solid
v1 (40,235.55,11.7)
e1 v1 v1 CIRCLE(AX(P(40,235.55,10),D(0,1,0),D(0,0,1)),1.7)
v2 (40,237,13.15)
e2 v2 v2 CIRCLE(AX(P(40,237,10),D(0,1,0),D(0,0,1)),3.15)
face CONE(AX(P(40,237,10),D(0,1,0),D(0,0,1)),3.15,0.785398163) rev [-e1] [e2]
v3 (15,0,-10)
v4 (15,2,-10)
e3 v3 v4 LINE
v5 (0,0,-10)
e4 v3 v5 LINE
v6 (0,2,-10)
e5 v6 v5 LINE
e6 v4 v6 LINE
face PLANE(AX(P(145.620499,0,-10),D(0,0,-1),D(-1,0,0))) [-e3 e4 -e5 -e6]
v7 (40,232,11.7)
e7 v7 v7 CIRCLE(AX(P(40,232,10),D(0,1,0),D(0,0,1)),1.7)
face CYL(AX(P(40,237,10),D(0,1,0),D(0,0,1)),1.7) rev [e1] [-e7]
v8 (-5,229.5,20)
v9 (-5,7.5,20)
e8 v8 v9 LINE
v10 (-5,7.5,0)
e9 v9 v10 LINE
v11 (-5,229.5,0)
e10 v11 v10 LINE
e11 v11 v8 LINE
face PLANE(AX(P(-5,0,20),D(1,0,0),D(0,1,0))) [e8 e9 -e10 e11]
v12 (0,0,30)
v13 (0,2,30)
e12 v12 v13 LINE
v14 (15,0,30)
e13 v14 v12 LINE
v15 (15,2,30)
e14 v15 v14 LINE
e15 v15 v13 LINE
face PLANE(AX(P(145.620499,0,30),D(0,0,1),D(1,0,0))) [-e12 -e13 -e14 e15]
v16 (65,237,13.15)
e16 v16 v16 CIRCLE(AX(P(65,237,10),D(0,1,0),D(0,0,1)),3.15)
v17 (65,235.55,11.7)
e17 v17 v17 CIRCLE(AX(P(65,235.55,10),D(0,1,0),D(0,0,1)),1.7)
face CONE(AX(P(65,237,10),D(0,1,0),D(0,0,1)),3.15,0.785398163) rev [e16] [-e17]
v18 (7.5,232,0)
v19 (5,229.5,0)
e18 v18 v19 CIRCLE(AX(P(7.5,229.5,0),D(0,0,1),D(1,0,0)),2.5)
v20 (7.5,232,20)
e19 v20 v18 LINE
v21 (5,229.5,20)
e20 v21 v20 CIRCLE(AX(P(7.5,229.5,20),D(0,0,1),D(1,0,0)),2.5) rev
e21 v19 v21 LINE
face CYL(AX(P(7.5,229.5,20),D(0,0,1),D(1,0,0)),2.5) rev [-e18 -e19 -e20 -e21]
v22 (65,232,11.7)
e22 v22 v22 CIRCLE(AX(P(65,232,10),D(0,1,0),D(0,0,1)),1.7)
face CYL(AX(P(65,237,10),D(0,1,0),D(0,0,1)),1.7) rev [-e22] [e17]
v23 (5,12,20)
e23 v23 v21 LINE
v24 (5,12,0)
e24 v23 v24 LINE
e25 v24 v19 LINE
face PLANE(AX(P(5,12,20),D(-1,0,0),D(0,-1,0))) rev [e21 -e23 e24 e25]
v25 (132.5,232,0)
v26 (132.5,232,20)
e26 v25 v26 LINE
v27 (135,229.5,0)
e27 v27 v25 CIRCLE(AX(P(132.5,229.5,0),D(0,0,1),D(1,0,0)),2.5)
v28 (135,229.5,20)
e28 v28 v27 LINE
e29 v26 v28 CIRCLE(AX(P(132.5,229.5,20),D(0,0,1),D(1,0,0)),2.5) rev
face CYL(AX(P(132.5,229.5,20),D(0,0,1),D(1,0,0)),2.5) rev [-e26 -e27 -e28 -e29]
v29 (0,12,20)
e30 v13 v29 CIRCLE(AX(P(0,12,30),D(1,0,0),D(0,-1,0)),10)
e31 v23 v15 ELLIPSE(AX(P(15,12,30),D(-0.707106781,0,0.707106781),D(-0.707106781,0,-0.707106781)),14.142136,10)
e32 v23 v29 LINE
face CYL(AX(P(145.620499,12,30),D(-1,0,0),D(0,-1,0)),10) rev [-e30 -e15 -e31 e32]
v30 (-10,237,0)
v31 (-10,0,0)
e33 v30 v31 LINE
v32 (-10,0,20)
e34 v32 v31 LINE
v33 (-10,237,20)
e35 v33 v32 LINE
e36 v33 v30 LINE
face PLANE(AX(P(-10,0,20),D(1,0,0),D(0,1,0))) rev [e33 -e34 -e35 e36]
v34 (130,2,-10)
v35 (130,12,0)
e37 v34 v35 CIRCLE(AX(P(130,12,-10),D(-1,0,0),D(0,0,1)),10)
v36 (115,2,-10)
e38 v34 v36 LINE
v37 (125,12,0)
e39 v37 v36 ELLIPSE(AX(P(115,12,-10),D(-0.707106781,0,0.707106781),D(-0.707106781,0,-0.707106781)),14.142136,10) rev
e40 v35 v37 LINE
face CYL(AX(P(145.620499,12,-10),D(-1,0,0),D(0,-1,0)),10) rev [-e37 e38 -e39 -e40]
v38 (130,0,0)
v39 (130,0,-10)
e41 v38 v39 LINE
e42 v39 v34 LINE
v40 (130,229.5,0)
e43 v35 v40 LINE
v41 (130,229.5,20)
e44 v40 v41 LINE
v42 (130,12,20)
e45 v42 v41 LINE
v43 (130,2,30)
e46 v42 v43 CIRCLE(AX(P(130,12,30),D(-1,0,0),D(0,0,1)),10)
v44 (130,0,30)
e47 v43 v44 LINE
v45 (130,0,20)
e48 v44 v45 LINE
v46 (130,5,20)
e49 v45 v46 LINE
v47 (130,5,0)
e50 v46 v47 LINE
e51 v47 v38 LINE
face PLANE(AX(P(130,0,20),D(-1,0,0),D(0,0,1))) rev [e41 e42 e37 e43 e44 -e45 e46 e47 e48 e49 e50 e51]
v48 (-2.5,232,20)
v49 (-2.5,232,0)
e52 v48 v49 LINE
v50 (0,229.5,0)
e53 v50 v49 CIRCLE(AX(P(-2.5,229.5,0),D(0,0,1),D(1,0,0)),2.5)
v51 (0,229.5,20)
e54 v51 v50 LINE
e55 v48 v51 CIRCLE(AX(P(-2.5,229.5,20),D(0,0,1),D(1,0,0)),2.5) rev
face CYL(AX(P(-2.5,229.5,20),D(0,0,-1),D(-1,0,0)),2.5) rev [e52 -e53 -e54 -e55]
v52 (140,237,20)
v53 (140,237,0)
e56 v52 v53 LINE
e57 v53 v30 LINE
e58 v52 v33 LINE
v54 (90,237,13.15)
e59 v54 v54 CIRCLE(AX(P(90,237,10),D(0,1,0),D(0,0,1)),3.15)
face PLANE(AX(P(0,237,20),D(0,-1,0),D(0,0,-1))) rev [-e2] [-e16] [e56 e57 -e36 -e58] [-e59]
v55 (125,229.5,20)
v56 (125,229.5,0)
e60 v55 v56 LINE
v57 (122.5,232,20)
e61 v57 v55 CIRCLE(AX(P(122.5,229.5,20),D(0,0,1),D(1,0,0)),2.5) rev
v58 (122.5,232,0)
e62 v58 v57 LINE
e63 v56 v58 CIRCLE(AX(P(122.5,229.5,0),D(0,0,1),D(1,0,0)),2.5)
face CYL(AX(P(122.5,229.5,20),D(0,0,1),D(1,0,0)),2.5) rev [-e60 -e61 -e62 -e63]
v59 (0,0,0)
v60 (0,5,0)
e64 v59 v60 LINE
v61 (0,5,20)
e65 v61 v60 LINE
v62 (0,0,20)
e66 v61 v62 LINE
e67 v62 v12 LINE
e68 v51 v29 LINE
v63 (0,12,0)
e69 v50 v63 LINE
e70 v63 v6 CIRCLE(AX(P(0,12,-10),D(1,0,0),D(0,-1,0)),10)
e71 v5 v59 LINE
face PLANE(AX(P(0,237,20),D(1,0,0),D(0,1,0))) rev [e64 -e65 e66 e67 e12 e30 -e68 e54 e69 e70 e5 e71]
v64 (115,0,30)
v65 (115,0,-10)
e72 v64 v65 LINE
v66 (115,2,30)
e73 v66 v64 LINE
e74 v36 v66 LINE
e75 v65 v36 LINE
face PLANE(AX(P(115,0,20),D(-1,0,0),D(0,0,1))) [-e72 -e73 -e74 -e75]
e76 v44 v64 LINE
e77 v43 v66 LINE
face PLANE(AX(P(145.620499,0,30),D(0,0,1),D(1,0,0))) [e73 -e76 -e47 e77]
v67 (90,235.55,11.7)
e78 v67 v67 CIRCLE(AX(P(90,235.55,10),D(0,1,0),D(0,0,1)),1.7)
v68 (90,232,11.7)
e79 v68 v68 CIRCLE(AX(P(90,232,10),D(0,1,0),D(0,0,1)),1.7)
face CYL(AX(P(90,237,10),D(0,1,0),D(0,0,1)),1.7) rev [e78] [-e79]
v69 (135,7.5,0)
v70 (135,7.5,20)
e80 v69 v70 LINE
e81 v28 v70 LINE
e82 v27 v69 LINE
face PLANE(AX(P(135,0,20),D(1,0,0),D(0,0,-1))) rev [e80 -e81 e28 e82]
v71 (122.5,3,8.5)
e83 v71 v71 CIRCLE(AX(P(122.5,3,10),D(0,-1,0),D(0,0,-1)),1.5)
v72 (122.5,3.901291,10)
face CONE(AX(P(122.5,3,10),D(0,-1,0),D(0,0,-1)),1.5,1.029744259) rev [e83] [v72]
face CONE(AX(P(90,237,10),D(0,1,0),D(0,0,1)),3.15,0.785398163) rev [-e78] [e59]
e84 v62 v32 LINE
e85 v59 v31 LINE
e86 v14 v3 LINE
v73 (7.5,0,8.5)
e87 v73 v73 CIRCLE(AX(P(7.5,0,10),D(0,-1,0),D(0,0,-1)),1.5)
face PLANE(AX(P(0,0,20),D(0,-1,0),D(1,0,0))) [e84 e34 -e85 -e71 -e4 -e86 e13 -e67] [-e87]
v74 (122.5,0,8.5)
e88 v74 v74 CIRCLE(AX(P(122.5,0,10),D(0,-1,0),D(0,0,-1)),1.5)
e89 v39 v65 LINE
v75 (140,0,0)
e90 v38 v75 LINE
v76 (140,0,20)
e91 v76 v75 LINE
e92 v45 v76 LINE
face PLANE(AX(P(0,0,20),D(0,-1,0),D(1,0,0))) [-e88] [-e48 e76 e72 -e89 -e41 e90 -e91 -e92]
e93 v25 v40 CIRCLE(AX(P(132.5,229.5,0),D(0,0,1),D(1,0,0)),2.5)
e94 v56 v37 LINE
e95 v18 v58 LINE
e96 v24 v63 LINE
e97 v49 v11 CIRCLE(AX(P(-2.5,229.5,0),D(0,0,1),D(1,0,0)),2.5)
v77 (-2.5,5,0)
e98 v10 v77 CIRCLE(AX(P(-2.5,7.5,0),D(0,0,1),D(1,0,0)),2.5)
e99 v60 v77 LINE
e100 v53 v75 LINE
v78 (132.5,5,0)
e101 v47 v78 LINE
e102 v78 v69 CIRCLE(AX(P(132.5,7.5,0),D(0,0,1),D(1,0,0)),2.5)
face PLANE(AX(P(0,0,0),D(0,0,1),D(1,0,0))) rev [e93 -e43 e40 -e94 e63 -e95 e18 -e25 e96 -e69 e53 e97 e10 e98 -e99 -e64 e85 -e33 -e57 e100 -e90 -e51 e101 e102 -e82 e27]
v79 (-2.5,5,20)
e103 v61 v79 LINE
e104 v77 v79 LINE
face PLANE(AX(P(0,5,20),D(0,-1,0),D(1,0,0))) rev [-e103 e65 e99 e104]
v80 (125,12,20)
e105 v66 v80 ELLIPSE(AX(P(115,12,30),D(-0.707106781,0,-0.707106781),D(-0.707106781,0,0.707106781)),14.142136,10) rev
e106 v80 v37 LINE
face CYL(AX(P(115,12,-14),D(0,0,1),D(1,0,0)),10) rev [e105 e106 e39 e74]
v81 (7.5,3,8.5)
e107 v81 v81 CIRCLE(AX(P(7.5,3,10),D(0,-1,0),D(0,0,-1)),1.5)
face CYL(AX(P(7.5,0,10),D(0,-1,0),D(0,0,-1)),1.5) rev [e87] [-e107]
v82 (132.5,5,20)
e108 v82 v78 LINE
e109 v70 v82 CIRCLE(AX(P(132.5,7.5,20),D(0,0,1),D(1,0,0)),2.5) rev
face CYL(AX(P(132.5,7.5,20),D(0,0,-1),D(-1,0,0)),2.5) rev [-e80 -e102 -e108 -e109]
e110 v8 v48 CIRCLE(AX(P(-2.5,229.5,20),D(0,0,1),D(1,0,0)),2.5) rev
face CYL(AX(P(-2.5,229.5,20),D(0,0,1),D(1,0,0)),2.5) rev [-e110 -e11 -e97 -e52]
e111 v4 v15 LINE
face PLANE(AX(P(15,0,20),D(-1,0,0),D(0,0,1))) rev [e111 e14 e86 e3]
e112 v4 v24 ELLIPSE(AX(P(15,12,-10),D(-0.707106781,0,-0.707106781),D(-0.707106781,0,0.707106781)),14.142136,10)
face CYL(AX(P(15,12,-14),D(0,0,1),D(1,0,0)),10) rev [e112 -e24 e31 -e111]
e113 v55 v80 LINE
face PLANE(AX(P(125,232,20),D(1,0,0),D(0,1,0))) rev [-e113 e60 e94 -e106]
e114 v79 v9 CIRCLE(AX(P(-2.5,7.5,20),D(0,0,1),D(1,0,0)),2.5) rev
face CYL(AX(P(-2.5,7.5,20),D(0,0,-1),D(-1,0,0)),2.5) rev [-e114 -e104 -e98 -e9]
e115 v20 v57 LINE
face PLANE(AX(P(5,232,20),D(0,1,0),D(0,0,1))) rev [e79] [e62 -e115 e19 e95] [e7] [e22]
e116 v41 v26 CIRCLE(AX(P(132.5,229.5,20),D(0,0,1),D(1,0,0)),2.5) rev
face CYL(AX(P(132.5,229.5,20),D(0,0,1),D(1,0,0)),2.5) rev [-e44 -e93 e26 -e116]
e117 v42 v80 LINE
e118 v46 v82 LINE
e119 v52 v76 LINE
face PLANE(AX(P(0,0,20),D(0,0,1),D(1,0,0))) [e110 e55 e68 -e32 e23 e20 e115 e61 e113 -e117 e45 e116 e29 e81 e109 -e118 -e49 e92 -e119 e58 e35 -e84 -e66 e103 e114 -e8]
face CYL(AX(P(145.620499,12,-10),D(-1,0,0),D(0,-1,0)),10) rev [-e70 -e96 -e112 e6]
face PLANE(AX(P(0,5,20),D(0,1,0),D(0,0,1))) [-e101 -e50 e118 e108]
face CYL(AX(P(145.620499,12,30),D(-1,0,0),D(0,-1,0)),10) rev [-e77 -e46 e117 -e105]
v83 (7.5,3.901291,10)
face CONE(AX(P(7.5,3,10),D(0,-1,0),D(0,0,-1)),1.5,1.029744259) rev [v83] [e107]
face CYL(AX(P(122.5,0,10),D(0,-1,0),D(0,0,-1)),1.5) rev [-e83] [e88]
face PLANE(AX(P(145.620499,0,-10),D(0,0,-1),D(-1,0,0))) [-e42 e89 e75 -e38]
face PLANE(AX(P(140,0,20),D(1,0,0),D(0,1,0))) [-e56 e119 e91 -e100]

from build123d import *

# Parameters (mm, degrees)
SKETCH2_W                                       = 5
SKETCH2_H                                       = 227
BOSS_EXTRUDE1_DEPTH                             = 20
BOSS_EXTRUDE2_REACH                             = 277.987
CUT_EXTRUDE1_DEPTH                              = 44
F_3_0MM_DOWEL_HOLE1_D                           = 3
F_3_0MM_DOWEL_HOLE1_DEPTH                       = 3
F_3_0MM_DOWEL_HOLE1_TIP                         = 0.901290929
CSK_FOR_M3_FLAT_HEAD_MACHINE_SCREW1_D           = 3.4
CSK_FOR_M3_FLAT_HEAD_MACHINE_SCREW1_CSINK_D     = 6.3
CSK_FOR_M3_FLAT_HEAD_MACHINE_SCREW1_CSINK_ANGLE = 90
FILLET1_R                                       = 2.5


with BuildPart() as part:
    # Sketch2 → Boss-Extrude1 (new body)
    with BuildSketch(Plane.XY):
        Polygon((15, 12), (5, 12), (5, 232), (125, 232), (125, 12), (115, 12), (115, 0), (140, 0), (140, 237), (-10, 237), (-10, 0), (15, 0), align=None)
        with Locations((132.5, 118.5)):
            Rectangle(SKETCH2_W, SKETCH2_H, mode=Mode.SUBTRACT)
        with Locations((-2.5, 118.5)):
            Rectangle(SKETCH2_W, SKETCH2_H, mode=Mode.SUBTRACT)
    extrude(amount=BOSS_EXTRUDE1_DEPTH)

    # Boss-Extrude2: up to this face of the body (flat: up to its plane)
    boss_extrude2_end = Plane(part.part.faces().sort_by_distance((130, 118.5, 10))[0])
    # Sketch3 → Boss-Extrude2 (add, up to the picked face)
    with BuildSketch(Plane.ZY, mode=Mode.PRIVATE) as boss_extrude2_sk1:
        with BuildLine():
            Line((20, 0), (30, 0))
            Line((30, 0), (30, 2))
            ThreePointArc((30, 2), (22.928932188, 4.928932188), (20, 12))
            Line((20, 12), (20, 0))
        make_face()
    boss_extrude2_tool1 = split(extrude(boss_extrude2_sk1.sketch, amount=-BOSS_EXTRUDE2_REACH, mode=Mode.PRIVATE), bisect_by=boss_extrude2_end, keep=Keep.BOTH, mode=Mode.PRIVATE)
    # Sketch3 → Boss-Extrude2 (add, up to the picked face)
    with BuildSketch(Plane.ZY, mode=Mode.PRIVATE) as boss_extrude2_sk2:
        with BuildLine():
            Line((0, 0), (-10, 0))
            Line((-10, 0), (-10, 2))
            ThreePointArc((-10, 2), (-2.928932188, 4.928932188), (0, 12))
            Line((0, 12), (0, 0))
        make_face()
    boss_extrude2_tool2 = split(extrude(boss_extrude2_sk2.sketch, amount=-BOSS_EXTRUDE2_REACH, mode=Mode.PRIVATE), bisect_by=boss_extrude2_end, keep=Keep.BOTH, mode=Mode.PRIVATE)
    add(boss_extrude2_tool1.solids().sort_by(Axis((0, 2.673783, 23.568126), (1, 0, 0)))[0])
    add(boss_extrude2_tool2.solids().sort_by(Axis((0, 2.673783, -3.568126), (1, 0, 0)))[0])

    # Sketch4 → Cut-Extrude1 (cut)
    with BuildSketch(Plane.XY.offset(30)):
        with BuildLine():
            Line((15, 2), (15, 0))
            Line((15, 0), (115, 0))
            Line((115, 0), (115, 2))
            ThreePointArc((115, 2), (122.071067812, 4.928932188), (125, 12))
            Line((125, 12), (5, 12))
            ThreePointArc((5, 12), (7.928932188, 4.928932188), (15, 2))
        make_face()
    extrude(amount=-CUT_EXTRUDE1_DEPTH, mode=Mode.SUBTRACT)

    # Ø3.0mm Dowel Hole1
    with Locations(Plane.XZ):
        with Locations((7.5, 10), (122.5, 10)):
            Hole(F_3_0MM_DOWEL_HOLE1_D / 2, depth=F_3_0MM_DOWEL_HOLE1_DEPTH)
            with Locations((0, 0, -(F_3_0MM_DOWEL_HOLE1_DEPTH + F_3_0MM_DOWEL_HOLE1_TIP / 2))):  # 118° drill point
                Cone(0, F_3_0MM_DOWEL_HOLE1_D / 2, F_3_0MM_DOWEL_HOLE1_TIP, mode=Mode.SUBTRACT)

    # CSK for M3 Flat Head Machine Screw1 (through all)
    with Locations(Plane(origin=(0, 237, 0), x_dir=(1, 0, 0), z_dir=(0, 1, 0))):
        with Locations((40, -10), (90, -10), (65, -10)):
            CounterSinkHole(CSK_FOR_M3_FLAT_HEAD_MACHINE_SCREW1_D / 2, CSK_FOR_M3_FLAT_HEAD_MACHINE_SCREW1_CSINK_D / 2, counter_sink_angle=CSK_FOR_M3_FLAT_HEAD_MACHINE_SCREW1_CSINK_ANGLE)

    # Fillet1
    fillet1_edges = [part.edges().sort_by_distance(p)[0] for p in [
        (0, 232, 10),
        (-5, 232, 10),
        (-5, 5, 10),
        (130, 232, 10),
        (135, 232, 10),
        (135, 5, 10),
        (5, 232, 10),
        (125, 232, 10),
    ]]
    fillet(fillet1_edges, radius=FILLET1_R - 0.0001)  # a hair under: the kernel refuses the full size


solid = part.part
